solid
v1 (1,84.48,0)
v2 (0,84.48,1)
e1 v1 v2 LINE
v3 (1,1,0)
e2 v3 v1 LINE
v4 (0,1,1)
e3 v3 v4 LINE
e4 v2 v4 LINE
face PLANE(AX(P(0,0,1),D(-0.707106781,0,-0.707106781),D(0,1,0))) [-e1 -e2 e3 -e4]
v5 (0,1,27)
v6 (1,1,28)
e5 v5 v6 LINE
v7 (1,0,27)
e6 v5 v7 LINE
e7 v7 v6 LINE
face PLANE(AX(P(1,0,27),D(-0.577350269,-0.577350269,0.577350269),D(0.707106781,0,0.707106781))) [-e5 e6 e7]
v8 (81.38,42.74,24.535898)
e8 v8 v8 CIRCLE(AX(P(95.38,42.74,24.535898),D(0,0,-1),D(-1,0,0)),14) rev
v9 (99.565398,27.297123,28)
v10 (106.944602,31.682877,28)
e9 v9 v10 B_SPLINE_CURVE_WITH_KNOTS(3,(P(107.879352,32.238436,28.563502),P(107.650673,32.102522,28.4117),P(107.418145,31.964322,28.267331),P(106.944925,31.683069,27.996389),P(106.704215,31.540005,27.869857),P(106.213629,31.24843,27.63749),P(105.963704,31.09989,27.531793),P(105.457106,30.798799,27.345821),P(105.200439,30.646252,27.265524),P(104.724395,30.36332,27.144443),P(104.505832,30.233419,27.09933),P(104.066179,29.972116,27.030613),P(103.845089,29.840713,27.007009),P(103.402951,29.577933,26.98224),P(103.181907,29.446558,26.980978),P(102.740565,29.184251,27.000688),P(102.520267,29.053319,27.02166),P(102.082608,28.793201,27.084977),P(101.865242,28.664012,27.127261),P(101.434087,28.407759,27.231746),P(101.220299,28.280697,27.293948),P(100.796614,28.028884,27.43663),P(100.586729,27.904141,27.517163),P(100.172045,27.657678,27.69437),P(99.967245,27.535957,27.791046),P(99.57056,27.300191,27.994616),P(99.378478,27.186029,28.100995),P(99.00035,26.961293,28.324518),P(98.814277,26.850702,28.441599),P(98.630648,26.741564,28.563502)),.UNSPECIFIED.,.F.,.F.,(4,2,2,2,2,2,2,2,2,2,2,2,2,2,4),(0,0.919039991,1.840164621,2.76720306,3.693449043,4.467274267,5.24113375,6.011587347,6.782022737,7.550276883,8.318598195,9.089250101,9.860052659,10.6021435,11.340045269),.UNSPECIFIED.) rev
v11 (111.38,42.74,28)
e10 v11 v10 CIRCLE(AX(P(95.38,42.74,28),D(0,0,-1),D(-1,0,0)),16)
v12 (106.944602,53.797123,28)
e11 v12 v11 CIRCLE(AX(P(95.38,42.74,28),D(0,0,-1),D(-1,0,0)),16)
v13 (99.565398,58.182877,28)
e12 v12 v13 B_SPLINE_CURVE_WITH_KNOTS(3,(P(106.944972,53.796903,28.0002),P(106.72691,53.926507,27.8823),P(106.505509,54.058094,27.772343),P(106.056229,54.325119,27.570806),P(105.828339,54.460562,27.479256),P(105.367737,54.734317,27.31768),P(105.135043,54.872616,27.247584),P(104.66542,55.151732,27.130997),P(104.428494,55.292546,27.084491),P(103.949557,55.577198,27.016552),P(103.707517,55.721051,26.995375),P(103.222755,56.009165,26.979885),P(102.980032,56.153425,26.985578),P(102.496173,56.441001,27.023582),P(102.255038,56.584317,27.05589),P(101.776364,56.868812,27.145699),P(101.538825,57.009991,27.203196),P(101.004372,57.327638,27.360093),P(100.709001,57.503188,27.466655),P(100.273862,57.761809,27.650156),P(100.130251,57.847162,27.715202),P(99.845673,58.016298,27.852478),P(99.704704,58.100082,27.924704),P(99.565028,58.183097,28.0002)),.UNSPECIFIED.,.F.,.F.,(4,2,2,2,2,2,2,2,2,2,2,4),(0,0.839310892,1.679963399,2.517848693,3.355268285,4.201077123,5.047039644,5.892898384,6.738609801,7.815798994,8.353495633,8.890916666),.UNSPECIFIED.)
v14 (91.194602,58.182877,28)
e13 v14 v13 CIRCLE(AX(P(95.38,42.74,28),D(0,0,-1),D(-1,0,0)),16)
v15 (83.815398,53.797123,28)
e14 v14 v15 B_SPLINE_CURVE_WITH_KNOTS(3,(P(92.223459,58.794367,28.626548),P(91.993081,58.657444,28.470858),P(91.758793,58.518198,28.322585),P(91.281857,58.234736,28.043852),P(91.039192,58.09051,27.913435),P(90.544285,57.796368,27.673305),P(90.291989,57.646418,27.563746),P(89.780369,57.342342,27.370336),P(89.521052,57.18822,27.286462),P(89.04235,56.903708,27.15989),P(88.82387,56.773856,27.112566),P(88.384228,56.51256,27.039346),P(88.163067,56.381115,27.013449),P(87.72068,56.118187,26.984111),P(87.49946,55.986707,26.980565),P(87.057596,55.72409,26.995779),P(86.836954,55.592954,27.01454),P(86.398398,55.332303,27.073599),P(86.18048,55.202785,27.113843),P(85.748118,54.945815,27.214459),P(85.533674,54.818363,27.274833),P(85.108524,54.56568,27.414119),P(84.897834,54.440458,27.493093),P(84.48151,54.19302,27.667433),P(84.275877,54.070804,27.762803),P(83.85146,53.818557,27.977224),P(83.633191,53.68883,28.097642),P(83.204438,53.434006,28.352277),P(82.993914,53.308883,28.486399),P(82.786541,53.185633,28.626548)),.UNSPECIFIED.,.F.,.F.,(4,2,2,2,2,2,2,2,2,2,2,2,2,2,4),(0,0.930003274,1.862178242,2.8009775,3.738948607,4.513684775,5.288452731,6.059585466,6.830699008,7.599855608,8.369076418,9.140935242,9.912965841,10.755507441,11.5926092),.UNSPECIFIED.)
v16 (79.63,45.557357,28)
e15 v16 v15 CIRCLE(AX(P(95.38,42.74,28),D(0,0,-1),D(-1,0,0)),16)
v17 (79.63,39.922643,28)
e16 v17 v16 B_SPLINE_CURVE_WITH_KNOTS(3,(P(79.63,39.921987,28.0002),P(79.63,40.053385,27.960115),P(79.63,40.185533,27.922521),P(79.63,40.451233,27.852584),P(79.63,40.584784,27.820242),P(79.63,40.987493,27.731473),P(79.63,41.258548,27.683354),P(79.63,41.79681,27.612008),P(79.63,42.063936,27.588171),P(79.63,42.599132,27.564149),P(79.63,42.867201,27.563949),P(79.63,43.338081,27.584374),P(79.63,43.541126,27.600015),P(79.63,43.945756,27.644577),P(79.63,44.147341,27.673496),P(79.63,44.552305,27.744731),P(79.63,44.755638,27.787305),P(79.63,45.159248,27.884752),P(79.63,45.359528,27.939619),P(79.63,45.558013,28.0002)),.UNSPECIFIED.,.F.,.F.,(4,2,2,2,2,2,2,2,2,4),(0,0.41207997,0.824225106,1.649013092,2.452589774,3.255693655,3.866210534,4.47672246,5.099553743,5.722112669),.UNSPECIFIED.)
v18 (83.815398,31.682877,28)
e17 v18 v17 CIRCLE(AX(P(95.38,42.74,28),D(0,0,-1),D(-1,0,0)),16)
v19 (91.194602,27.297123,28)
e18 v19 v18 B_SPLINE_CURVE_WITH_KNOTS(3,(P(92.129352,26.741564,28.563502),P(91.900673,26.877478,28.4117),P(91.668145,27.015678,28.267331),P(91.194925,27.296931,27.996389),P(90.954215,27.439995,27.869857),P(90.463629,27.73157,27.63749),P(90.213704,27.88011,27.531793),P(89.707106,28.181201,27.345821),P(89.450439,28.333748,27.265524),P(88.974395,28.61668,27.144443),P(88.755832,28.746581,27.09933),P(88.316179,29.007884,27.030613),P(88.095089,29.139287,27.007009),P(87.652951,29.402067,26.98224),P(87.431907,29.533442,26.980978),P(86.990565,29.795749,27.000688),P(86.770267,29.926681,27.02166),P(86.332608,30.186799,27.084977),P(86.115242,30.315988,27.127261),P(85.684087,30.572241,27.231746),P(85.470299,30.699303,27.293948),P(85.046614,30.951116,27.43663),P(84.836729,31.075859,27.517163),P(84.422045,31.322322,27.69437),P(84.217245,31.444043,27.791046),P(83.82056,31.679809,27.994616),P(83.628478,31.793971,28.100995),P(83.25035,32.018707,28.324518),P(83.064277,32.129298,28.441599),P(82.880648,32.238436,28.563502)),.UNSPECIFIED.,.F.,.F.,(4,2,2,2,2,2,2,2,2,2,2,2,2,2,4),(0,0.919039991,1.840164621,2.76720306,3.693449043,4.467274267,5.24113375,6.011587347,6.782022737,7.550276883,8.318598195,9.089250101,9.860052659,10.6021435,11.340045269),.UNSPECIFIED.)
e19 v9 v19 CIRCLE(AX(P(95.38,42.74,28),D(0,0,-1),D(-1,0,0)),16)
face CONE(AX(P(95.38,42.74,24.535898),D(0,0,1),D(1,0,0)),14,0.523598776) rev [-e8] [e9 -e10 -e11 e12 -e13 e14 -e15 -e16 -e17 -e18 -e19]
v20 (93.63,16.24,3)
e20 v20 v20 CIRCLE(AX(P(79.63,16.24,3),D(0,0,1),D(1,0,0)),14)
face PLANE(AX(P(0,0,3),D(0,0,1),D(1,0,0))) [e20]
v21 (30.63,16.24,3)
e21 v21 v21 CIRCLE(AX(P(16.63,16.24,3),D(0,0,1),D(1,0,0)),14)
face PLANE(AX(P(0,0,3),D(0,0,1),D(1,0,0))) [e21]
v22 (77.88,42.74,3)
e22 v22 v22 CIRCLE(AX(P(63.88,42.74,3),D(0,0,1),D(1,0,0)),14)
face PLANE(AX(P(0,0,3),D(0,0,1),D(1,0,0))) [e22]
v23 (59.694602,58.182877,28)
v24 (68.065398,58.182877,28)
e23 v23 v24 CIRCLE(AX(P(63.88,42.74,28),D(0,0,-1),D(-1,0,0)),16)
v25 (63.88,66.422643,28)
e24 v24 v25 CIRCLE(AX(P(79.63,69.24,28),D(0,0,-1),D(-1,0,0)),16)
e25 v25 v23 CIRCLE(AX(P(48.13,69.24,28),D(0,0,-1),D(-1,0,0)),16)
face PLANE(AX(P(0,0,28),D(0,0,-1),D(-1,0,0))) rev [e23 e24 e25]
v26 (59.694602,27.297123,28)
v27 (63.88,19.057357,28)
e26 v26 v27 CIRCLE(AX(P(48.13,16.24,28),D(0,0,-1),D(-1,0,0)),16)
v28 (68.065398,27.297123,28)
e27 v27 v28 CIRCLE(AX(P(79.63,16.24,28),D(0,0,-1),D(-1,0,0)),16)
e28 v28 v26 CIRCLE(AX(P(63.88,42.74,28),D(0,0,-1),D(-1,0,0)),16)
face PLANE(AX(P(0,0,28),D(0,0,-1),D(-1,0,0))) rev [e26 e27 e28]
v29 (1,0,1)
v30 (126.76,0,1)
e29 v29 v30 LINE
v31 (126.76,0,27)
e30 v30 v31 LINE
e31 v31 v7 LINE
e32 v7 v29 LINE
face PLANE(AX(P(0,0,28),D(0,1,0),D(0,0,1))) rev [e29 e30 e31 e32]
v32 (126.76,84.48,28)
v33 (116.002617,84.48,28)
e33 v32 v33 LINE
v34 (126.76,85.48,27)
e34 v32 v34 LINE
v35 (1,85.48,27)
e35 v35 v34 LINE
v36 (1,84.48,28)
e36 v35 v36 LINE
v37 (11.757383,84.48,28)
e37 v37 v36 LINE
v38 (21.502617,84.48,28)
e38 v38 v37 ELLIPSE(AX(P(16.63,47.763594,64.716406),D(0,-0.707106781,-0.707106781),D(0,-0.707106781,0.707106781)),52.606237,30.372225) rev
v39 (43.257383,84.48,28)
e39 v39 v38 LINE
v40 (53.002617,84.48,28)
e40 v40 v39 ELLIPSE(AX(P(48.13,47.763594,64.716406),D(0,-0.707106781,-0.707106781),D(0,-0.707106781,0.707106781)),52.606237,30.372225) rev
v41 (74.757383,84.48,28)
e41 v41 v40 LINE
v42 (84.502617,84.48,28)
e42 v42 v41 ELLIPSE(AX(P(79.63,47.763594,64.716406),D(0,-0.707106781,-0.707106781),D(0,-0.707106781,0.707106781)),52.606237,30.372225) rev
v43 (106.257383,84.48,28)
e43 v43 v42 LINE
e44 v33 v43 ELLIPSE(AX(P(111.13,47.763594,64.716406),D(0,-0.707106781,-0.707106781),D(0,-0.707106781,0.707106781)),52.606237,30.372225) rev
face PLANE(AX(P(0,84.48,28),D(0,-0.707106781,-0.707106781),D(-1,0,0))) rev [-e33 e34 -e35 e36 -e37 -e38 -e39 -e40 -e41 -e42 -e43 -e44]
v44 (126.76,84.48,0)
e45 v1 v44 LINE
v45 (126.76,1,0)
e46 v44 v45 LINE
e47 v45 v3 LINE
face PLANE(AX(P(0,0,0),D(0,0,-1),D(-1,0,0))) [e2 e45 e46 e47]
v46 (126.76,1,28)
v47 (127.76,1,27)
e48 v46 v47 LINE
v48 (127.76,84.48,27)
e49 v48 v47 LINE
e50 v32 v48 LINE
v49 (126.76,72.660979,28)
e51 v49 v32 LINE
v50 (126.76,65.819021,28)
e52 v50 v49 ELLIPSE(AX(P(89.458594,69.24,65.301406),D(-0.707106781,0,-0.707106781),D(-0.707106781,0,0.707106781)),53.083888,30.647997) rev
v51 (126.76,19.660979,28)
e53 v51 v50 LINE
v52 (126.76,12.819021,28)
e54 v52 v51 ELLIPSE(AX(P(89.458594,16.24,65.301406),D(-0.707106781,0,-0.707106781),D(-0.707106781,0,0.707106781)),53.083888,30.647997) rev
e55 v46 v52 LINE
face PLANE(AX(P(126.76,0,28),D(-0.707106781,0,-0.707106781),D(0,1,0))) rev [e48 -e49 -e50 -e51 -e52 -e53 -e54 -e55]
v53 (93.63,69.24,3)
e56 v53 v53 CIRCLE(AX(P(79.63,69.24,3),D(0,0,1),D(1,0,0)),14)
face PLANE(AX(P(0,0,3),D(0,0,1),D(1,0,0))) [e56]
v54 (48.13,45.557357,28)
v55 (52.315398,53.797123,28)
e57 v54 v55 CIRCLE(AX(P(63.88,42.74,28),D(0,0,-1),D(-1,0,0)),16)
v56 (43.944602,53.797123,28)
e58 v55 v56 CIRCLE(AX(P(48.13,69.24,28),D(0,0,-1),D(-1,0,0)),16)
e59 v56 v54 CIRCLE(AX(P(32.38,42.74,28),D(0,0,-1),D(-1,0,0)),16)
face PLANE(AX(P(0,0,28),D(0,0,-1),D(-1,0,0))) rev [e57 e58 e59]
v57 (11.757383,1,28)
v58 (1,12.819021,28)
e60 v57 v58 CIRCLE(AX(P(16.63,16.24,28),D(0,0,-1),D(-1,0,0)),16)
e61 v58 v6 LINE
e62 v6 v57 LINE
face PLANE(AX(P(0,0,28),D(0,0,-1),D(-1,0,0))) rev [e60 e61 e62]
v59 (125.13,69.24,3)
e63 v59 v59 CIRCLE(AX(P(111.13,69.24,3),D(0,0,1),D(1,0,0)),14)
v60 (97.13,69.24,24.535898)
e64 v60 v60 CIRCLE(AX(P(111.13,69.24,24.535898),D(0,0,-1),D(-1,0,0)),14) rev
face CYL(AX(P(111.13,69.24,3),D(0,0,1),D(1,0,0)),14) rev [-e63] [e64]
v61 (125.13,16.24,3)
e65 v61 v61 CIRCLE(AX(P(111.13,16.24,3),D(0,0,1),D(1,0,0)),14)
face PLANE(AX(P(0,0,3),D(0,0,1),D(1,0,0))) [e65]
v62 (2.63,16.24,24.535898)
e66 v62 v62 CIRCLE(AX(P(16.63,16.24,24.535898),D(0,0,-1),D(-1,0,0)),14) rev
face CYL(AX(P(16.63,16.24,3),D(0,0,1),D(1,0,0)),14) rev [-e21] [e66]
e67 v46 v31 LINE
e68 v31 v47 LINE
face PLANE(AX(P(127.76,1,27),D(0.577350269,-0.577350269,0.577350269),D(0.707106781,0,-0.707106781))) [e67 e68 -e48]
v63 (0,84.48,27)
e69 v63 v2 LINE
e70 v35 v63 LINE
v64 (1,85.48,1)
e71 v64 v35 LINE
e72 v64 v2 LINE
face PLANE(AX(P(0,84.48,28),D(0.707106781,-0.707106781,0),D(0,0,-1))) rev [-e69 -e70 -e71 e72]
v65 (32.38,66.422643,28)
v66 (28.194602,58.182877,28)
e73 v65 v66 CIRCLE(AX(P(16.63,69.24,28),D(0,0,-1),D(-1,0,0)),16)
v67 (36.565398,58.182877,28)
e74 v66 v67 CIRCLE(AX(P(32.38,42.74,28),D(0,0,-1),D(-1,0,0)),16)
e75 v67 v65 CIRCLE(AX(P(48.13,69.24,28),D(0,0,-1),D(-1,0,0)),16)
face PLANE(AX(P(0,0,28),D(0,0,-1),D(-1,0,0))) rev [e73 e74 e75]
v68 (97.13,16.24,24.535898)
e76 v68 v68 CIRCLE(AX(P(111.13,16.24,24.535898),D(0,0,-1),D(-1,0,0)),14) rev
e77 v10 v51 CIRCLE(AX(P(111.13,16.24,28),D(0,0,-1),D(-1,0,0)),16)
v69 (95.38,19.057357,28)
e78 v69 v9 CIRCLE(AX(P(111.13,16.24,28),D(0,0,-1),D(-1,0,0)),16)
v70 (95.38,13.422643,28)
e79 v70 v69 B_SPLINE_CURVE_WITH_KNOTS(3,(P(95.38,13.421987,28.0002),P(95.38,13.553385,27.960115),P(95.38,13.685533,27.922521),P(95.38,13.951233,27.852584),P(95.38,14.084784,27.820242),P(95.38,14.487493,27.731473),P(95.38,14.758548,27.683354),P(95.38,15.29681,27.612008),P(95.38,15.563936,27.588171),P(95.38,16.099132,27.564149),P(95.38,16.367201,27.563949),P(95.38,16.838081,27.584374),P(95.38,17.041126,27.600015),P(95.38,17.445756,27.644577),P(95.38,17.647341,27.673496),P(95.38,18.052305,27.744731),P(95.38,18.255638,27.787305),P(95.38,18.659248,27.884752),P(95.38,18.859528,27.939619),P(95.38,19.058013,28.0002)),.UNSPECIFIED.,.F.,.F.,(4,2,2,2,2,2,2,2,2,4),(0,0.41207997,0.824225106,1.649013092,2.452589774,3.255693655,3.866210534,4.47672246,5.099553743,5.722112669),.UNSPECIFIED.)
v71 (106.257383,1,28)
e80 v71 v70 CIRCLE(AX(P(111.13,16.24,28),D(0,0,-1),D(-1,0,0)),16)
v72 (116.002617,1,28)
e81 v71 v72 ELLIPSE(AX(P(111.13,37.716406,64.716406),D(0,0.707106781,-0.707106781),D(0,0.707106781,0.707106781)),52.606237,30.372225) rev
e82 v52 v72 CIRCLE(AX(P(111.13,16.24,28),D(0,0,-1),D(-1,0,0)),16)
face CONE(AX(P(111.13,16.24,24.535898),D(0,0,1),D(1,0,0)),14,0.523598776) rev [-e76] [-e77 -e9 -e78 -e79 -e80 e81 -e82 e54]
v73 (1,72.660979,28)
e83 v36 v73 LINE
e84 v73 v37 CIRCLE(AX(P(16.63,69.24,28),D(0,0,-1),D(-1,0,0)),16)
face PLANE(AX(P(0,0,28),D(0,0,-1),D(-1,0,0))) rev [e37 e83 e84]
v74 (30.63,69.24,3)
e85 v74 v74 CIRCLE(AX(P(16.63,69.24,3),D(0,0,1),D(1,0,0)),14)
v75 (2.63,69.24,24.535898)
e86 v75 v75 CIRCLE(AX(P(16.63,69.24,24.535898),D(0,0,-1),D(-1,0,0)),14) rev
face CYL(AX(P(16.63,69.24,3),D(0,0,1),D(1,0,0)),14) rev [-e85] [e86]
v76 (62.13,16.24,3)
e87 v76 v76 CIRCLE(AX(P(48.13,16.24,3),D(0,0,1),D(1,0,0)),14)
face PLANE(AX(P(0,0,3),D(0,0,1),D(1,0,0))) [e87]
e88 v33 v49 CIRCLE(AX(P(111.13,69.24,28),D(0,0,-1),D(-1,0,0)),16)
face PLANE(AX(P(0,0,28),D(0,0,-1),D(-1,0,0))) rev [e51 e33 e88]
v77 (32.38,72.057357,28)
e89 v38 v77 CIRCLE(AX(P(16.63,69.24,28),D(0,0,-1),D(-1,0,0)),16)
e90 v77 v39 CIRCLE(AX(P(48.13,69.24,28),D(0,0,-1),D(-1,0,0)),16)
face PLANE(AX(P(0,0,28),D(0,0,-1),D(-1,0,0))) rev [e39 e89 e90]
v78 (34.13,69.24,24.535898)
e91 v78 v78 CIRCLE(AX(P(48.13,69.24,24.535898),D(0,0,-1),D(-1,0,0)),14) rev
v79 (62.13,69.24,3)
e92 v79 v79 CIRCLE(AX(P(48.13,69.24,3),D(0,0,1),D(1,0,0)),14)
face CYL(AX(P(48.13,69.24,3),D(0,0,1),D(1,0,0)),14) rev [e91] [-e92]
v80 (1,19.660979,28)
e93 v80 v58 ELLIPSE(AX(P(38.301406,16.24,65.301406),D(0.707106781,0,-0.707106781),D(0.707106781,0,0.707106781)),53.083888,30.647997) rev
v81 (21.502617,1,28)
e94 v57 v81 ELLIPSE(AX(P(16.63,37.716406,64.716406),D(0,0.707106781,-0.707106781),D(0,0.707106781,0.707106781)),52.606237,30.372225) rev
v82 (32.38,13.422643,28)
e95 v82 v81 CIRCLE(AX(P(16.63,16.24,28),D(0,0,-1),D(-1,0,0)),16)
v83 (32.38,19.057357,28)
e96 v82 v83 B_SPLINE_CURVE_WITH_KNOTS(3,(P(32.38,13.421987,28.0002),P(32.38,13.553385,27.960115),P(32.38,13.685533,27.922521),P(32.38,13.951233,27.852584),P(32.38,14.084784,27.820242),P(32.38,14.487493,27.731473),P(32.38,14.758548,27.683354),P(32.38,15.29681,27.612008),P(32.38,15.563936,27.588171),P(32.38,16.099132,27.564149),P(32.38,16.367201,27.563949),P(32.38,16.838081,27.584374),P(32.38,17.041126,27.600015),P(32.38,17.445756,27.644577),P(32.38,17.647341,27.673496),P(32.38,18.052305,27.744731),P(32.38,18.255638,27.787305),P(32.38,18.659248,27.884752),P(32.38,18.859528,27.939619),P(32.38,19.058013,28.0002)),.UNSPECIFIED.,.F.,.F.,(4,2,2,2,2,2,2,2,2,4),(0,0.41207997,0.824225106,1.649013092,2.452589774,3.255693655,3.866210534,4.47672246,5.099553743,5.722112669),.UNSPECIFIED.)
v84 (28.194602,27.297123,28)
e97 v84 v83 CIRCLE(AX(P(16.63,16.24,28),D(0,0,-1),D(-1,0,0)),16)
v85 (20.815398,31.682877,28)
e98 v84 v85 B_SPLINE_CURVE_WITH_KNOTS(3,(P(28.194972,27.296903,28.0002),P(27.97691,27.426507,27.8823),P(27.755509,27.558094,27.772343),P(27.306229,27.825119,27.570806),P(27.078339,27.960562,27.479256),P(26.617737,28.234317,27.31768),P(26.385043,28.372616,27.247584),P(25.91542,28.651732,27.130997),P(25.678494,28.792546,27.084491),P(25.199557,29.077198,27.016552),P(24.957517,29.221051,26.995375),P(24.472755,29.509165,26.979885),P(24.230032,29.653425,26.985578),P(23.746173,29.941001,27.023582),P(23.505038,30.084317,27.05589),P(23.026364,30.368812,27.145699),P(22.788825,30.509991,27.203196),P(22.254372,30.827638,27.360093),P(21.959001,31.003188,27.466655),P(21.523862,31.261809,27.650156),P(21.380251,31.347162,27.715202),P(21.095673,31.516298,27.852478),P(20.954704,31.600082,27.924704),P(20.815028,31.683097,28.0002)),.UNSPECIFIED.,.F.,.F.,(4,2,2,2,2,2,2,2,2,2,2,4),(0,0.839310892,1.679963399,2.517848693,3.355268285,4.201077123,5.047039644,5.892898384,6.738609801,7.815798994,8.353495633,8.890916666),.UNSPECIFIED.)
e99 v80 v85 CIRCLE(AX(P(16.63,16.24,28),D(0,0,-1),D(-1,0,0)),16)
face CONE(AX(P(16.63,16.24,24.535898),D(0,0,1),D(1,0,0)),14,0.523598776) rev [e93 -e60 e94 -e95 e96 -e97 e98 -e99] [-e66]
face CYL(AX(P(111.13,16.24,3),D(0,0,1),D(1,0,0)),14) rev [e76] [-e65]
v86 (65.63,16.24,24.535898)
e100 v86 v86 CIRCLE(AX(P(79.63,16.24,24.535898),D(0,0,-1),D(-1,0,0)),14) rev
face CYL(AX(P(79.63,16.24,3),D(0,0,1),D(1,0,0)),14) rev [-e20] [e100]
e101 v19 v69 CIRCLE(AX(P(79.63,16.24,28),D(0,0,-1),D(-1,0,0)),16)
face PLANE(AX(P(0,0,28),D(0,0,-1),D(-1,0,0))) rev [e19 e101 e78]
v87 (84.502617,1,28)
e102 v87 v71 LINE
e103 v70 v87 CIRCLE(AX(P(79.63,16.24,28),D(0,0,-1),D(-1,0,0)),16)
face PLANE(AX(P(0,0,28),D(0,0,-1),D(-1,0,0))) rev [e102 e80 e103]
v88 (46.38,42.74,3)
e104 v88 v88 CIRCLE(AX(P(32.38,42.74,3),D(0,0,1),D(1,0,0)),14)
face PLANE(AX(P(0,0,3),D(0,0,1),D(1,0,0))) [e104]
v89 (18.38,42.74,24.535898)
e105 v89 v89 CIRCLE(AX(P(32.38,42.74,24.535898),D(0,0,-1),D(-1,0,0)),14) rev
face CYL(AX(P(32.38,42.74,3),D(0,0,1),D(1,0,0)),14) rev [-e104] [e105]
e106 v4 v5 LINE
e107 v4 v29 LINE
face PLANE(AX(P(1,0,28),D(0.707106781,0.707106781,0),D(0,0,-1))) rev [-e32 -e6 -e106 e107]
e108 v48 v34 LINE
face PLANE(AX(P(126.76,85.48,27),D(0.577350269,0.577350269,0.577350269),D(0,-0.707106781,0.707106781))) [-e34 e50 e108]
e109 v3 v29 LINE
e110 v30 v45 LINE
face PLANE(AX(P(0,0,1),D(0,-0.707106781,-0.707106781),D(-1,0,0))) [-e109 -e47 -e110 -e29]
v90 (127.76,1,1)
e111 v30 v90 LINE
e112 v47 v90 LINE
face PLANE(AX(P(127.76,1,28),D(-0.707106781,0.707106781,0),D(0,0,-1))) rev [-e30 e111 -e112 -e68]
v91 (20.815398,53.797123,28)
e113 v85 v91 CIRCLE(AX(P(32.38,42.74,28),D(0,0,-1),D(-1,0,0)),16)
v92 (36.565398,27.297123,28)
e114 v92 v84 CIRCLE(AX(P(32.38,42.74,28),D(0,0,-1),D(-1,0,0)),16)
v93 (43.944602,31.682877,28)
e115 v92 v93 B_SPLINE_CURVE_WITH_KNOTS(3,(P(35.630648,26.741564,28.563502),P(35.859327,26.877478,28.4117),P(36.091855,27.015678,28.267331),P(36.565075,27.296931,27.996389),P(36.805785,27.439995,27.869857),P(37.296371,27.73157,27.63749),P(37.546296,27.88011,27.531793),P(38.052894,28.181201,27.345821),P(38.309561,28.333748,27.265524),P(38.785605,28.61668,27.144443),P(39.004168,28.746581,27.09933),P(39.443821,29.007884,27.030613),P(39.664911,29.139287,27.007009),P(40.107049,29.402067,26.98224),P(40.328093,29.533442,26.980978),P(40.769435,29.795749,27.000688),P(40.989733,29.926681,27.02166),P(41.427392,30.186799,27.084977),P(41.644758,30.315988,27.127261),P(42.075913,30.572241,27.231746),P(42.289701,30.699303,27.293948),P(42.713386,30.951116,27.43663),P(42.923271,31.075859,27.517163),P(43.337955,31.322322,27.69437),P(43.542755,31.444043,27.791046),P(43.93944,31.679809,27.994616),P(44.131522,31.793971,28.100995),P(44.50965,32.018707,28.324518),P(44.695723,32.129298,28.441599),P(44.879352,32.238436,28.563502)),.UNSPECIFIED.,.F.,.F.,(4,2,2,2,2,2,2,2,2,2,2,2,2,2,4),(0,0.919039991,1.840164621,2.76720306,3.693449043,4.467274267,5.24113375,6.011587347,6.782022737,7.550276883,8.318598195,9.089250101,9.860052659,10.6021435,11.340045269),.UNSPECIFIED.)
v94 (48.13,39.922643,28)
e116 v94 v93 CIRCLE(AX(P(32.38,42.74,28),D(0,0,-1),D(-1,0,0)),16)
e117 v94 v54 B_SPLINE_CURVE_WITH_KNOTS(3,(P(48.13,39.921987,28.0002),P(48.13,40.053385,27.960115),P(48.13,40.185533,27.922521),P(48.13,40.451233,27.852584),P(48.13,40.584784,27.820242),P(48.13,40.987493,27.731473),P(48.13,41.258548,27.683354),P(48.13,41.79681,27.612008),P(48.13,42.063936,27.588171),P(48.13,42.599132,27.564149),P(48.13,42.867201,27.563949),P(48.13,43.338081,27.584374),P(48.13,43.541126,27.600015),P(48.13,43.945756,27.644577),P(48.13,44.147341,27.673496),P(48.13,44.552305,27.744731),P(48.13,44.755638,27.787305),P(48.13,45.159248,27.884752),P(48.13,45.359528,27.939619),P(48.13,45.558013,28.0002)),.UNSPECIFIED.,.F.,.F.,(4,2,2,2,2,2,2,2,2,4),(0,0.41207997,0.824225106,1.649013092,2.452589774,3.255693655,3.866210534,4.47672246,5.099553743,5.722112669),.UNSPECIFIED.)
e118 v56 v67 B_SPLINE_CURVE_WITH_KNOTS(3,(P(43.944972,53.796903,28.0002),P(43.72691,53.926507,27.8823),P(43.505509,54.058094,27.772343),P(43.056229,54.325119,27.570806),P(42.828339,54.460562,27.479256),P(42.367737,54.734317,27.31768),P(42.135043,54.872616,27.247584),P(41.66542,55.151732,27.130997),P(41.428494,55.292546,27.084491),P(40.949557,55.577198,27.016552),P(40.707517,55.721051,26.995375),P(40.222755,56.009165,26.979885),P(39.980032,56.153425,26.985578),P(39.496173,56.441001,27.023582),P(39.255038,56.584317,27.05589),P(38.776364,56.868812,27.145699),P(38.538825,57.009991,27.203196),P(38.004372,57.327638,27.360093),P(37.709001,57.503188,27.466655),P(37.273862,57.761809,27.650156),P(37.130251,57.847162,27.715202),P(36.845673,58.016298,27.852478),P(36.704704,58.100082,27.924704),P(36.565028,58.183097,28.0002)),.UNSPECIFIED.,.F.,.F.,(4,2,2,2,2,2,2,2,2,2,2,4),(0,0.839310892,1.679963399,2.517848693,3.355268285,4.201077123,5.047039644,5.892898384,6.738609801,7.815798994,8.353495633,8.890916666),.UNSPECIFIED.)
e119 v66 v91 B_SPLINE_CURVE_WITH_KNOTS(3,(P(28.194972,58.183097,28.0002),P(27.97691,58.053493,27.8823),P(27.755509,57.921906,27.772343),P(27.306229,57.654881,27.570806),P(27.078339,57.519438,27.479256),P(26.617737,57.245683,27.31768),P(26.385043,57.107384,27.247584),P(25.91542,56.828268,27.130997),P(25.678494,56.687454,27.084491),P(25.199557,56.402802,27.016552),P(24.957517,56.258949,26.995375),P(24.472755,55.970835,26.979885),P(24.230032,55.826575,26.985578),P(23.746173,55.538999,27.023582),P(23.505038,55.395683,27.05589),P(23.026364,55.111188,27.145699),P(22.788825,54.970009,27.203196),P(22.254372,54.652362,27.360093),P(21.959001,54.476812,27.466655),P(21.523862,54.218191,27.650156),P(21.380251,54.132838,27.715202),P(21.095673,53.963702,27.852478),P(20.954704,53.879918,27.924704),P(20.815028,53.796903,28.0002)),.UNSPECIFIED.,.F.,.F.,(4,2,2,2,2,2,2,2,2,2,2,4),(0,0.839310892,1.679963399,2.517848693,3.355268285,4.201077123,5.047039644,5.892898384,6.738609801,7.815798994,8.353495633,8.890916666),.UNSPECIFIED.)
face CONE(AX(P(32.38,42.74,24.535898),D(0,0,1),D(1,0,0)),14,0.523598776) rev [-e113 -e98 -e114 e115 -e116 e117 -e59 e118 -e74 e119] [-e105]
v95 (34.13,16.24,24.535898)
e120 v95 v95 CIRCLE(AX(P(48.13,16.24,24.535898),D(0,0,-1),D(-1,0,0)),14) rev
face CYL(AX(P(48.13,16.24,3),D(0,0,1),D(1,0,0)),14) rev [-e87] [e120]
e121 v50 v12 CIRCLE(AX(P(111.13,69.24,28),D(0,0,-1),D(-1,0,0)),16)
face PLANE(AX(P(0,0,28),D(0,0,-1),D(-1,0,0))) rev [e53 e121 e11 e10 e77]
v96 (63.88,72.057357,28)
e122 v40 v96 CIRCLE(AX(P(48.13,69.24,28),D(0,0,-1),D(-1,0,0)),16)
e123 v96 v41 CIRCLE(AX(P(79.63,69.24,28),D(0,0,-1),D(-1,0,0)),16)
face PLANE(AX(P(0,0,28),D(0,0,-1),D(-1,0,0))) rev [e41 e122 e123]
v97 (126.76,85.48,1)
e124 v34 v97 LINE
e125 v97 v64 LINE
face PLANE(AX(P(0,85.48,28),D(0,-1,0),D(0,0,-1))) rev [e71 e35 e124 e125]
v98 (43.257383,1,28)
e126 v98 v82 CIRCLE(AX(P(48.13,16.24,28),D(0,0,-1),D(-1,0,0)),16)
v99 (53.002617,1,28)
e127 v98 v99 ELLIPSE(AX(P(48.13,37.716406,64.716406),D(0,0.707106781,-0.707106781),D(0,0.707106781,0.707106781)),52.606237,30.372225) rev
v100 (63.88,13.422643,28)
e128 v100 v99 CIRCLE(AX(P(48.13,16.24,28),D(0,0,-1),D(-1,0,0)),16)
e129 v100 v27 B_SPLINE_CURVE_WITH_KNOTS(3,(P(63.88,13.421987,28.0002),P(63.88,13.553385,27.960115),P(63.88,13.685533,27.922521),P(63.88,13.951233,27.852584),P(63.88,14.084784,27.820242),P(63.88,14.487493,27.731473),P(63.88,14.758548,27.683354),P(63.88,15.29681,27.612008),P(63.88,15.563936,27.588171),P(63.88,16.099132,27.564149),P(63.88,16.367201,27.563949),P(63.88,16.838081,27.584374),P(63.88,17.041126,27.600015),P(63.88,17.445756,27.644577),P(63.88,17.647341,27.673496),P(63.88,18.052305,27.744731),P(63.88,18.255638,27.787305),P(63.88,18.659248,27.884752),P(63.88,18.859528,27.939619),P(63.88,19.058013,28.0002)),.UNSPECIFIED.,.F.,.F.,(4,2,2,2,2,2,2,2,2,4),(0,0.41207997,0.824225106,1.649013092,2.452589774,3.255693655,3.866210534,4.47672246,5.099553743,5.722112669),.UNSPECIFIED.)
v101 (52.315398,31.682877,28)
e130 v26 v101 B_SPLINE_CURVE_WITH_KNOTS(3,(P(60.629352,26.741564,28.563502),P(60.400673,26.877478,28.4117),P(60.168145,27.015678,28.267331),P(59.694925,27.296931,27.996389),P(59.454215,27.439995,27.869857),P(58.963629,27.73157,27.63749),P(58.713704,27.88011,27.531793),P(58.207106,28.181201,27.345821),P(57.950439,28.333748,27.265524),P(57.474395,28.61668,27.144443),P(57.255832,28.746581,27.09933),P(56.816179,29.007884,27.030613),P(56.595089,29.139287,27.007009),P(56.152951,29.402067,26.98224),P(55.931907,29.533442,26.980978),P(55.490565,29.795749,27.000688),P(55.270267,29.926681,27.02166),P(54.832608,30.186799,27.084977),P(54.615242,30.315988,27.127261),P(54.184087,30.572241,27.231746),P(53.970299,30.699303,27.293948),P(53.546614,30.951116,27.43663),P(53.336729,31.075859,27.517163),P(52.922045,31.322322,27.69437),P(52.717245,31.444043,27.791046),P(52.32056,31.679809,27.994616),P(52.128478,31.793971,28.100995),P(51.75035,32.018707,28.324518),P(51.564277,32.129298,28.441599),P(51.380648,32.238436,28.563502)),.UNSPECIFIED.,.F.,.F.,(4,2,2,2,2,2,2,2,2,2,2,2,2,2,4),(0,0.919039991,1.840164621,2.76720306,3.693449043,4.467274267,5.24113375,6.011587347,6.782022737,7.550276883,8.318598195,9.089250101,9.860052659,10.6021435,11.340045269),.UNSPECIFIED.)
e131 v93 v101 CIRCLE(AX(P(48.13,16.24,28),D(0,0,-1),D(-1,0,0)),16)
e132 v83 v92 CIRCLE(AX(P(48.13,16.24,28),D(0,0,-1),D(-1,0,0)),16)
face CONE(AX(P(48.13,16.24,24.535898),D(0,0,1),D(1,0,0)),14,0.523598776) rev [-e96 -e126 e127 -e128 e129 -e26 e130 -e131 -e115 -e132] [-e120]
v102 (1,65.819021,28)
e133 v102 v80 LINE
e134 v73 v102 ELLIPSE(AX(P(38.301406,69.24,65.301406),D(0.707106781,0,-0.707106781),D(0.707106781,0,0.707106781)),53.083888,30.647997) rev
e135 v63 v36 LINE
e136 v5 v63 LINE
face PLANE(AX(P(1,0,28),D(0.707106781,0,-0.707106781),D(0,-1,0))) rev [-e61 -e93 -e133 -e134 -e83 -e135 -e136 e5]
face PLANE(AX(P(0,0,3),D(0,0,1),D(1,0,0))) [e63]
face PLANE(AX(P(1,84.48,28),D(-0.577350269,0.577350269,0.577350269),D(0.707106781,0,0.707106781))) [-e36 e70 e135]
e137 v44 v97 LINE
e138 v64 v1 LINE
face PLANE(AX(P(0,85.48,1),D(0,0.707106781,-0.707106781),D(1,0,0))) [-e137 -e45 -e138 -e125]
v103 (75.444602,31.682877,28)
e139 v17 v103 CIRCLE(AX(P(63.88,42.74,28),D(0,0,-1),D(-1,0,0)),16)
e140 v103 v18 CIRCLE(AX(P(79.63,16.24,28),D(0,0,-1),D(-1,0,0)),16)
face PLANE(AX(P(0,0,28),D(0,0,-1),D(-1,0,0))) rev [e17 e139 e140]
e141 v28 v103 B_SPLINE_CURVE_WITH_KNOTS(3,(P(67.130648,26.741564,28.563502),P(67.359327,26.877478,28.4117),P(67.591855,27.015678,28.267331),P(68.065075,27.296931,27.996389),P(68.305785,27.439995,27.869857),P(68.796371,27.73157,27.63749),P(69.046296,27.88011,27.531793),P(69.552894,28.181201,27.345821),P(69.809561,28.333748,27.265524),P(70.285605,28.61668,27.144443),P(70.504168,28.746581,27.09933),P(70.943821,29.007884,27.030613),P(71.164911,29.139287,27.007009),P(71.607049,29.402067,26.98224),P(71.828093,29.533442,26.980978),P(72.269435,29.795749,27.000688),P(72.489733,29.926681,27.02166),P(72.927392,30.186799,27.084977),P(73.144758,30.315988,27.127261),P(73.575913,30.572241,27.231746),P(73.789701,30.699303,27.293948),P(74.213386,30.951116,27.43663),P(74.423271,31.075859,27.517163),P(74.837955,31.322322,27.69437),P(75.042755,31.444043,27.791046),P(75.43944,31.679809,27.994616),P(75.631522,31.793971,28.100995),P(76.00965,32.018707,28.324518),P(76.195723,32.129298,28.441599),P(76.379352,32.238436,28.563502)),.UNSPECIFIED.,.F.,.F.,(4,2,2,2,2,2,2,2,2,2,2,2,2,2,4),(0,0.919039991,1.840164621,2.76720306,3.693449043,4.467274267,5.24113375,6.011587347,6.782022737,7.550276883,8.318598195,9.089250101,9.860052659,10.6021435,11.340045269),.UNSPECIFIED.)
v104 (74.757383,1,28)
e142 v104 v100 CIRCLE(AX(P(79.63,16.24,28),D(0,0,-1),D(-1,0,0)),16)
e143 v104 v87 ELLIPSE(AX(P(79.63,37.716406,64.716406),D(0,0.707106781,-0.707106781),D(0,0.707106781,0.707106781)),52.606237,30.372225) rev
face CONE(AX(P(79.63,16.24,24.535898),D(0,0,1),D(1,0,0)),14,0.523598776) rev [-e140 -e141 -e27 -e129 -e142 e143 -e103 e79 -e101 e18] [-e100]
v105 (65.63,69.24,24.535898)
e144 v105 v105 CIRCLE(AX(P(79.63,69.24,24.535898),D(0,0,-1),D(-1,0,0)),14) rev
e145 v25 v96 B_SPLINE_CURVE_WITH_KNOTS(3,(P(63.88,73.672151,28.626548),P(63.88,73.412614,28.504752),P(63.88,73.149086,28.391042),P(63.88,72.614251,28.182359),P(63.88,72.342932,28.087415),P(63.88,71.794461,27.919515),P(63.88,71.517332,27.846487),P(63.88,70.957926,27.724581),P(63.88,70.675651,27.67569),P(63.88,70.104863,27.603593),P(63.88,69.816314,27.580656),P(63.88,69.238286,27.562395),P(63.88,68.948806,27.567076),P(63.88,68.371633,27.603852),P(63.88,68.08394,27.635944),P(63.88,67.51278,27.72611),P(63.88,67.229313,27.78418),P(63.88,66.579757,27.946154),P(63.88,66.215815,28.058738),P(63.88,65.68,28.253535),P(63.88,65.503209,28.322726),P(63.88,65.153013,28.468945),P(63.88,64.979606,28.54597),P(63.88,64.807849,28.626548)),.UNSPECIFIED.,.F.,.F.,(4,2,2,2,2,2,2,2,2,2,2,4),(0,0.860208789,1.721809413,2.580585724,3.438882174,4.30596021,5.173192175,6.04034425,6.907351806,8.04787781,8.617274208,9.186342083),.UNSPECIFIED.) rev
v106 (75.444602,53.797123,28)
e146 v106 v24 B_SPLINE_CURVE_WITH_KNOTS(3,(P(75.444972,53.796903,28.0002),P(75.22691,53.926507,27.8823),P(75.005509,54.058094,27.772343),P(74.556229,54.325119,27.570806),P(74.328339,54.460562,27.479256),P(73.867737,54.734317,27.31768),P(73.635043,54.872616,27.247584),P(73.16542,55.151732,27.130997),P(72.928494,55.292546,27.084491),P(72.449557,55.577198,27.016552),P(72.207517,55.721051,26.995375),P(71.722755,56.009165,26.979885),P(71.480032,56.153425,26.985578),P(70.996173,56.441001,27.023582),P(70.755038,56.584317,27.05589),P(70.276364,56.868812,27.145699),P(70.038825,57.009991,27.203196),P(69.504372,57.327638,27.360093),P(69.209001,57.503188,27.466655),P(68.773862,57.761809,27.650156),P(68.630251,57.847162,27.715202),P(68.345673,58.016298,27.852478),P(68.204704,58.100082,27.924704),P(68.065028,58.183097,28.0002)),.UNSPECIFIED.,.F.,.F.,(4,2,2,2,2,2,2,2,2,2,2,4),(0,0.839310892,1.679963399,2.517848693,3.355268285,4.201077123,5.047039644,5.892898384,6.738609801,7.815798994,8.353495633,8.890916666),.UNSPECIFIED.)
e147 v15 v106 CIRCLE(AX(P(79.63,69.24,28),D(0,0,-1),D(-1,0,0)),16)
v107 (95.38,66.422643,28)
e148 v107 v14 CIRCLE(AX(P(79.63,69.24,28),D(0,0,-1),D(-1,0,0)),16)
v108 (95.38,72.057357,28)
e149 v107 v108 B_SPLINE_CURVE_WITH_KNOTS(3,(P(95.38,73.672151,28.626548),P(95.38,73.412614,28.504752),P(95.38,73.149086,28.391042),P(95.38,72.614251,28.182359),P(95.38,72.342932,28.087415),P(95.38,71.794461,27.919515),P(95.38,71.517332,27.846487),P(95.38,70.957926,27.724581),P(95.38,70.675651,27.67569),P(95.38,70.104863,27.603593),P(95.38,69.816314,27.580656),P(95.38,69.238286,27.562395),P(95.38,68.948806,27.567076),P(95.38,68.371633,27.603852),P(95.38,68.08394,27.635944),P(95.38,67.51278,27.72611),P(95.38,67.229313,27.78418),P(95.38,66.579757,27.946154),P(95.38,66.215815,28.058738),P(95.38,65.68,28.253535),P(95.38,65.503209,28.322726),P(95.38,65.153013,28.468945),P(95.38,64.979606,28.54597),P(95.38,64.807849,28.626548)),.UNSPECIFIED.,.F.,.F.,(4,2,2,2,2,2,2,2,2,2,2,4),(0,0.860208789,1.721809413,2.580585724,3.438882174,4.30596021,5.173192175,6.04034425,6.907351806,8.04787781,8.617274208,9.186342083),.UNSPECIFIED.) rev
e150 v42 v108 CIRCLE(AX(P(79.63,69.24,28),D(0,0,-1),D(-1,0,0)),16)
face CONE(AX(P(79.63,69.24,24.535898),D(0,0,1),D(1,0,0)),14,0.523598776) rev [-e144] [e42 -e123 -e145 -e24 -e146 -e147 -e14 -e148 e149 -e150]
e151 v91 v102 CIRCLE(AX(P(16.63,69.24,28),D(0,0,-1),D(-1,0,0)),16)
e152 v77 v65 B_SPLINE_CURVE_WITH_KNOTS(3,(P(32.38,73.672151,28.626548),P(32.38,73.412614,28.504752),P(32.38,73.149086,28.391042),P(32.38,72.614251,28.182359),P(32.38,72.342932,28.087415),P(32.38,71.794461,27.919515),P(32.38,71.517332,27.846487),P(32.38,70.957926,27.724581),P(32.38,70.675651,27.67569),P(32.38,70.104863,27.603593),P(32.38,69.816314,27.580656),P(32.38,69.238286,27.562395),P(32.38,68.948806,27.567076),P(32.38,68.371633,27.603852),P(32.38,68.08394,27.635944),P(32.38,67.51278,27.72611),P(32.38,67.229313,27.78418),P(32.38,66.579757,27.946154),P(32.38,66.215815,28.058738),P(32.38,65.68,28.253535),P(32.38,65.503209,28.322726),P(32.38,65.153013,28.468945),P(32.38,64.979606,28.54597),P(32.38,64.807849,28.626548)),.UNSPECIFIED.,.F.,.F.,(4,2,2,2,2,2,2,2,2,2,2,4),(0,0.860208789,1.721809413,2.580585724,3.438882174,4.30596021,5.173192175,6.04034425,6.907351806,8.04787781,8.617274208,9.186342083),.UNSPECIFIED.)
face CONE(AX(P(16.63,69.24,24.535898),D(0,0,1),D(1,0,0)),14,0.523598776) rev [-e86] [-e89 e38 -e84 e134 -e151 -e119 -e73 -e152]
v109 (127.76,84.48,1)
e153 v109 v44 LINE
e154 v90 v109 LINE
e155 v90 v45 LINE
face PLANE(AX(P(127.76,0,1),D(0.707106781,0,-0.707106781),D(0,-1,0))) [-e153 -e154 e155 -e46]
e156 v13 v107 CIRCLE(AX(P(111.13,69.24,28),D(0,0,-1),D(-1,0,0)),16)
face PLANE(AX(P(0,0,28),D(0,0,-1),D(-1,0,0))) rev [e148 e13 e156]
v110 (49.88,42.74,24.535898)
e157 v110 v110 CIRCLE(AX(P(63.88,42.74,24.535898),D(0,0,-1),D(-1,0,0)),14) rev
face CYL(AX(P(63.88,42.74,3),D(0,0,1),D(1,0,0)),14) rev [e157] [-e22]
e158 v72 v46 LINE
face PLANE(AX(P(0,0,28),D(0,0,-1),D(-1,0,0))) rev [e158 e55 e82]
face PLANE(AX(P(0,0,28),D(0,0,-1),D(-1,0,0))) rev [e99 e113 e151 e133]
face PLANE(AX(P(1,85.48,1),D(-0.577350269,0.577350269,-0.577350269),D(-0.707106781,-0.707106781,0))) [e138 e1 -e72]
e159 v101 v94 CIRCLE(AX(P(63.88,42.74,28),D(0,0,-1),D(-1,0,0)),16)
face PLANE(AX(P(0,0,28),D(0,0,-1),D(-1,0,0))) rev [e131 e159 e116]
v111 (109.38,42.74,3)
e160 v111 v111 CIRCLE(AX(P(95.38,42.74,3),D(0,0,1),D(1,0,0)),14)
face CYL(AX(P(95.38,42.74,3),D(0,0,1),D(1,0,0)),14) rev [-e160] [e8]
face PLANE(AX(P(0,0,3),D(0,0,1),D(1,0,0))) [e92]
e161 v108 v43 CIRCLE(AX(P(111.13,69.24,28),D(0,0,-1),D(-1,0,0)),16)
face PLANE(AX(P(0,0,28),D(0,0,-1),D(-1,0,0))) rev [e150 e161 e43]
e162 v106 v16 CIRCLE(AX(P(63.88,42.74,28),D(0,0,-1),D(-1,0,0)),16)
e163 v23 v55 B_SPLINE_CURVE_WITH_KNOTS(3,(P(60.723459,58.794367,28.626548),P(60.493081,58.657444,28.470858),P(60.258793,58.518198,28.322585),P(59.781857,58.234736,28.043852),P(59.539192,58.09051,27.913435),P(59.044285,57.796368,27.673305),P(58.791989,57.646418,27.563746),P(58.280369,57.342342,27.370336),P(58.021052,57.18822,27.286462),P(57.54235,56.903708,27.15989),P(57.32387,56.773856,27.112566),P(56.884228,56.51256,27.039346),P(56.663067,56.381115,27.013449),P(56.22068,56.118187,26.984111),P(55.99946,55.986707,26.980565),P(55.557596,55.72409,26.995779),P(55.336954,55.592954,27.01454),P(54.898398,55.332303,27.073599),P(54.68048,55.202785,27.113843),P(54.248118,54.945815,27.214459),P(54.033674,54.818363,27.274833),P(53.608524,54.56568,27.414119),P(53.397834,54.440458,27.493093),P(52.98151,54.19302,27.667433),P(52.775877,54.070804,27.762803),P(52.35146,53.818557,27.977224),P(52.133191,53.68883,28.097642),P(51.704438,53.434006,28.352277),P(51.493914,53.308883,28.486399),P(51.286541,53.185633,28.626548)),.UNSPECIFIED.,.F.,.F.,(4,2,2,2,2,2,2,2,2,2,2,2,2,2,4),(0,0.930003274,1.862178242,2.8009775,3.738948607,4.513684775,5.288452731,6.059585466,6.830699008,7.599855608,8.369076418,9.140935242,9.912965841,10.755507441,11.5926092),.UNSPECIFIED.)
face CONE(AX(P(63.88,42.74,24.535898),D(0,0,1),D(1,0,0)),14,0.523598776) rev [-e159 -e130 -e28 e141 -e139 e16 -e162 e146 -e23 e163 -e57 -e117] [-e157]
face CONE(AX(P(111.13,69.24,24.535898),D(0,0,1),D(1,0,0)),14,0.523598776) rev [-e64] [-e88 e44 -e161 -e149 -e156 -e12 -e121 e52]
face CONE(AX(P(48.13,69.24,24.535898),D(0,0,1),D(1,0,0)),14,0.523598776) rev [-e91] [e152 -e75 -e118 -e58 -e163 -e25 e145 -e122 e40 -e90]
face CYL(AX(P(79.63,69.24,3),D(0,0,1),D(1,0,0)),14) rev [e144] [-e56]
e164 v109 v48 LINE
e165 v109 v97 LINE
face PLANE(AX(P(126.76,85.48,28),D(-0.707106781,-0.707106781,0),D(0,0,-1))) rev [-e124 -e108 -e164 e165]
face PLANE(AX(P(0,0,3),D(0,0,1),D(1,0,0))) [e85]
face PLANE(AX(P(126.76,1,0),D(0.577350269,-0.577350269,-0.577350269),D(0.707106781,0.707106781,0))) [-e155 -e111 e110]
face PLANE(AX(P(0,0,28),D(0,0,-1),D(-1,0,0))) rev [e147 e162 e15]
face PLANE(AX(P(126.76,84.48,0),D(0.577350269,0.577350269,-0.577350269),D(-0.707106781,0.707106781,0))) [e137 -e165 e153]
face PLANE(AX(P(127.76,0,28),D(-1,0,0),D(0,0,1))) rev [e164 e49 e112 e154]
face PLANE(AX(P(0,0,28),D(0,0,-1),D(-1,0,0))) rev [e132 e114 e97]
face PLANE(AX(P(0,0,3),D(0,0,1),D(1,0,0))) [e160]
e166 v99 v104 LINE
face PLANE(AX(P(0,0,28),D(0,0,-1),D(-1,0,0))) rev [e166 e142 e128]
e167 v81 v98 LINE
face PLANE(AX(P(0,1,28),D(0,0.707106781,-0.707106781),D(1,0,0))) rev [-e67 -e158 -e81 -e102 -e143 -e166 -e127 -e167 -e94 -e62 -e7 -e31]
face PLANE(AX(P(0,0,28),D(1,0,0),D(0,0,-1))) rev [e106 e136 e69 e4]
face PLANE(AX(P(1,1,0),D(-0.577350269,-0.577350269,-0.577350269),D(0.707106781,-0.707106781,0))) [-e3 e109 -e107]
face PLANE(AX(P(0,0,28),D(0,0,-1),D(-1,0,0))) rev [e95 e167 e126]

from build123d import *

# Parameters (mm, degrees)
ESQUISSE1_W             = 127.76
ESQUISSE1_H             = 85.48
BOSS_EXTRU_1_DEPTH      = 28
ESQUISSE2_R             = 14
ENL_V_MAT_EXTRU_1_DEPTH = 25
CHANFREIN1_SIZE         = 2
CHANFREIN1_SIZE_2       = 3.464101615


with BuildPart() as part:
    # Esquisse1 → Boss.-Extru.1 (new body)
    with BuildSketch(Plane.XY):
        with Locations((63.88, 42.74)):
            Rectangle(ESQUISSE1_W, ESQUISSE1_H)
    extrude(amount=BOSS_EXTRU_1_DEPTH)

    # Esquisse2 → Enlèv. mat.-Extru.1 (cut)
    with BuildSketch(Plane.XY.offset(28)):
        with Locations((111.13, 69.24)):
            Circle(ESQUISSE2_R)
        with Locations((79.63, 69.24)):
            Circle(ESQUISSE2_R)
        with Locations((48.13, 69.24)):
            Circle(ESQUISSE2_R)
        with Locations((16.63, 69.24)):
            Circle(ESQUISSE2_R)
        with Locations((32.38, 42.74)):
            Circle(ESQUISSE2_R)
        with Locations((16.63, 16.24)):
            Circle(ESQUISSE2_R)
        with Locations((48.13, 16.24)):
            Circle(ESQUISSE2_R)
        with Locations((111.13, 16.24)):
            Circle(ESQUISSE2_R)
        with Locations((79.63, 16.24)):
            Circle(ESQUISSE2_R)
        with Locations((63.88, 42.74)):
            Circle(ESQUISSE2_R)
        with Locations((95.38, 42.74)):
            Circle(ESQUISSE2_R)
    extrude(amount=-ENL_V_MAT_EXTRU_1_DEPTH, mode=Mode.SUBTRACT)

    # Chanfrein1
    # the kernel refuses this chamfer: 3.464101615, 2 mm, written as the material it takes off along each edge
    with BuildSketch(Plane(origin=(79.63, 69.24, 28), x_dir=(1, 0, 0), z_dir=(0, -1, 0))) as chanfrein1_piece_1:
        Polygon((14 + CHANFREIN1_SIZE, 0), (14, -CHANFREIN1_SIZE_2), (14, 0), align=None)
    revolve(axis=Axis((79.63, 69.24, 28), (0, 0, 1)), mode=Mode.SUBTRACT)
    with BuildSketch(Plane(origin=(111.13, 69.24, 28), x_dir=(1, 0, 0), z_dir=(0, -1, 0))) as chanfrein1_piece_2:
        Polygon((14 + CHANFREIN1_SIZE, 0), (14, -CHANFREIN1_SIZE_2), (14, 0), align=None)
    revolve(axis=Axis((111.13, 69.24, 28), (0, 0, 1)), mode=Mode.SUBTRACT)
    with BuildSketch(Plane(origin=(63.88, 42.74, 28), x_dir=(1, 0, 0), z_dir=(0, -1, 0))) as chanfrein1_piece_3:
        Polygon((14 + CHANFREIN1_SIZE, 0), (14, -CHANFREIN1_SIZE_2), (14, 0), align=None)
    revolve(axis=Axis((63.88, 42.74, 28), (0, 0, 1)), mode=Mode.SUBTRACT)
    with BuildSketch(Plane(origin=(95.38, 42.74, 28), x_dir=(1, 0, 0), z_dir=(0, -1, 0))) as chanfrein1_piece_4:
        Polygon((14 + CHANFREIN1_SIZE, 0), (14, -CHANFREIN1_SIZE_2), (14, 0), align=None)
    revolve(axis=Axis((95.38, 42.74, 28), (0, 0, 1)), mode=Mode.SUBTRACT)
    with BuildSketch(Plane(origin=(32.38, 42.74, 28), x_dir=(1, 0, 0), z_dir=(0, -1, 0))) as chanfrein1_piece_5:
        Polygon((14 + CHANFREIN1_SIZE, 0), (14, -CHANFREIN1_SIZE_2), (14, 0), align=None)
    revolve(axis=Axis((32.38, 42.74, 28), (0, 0, 1)), mode=Mode.SUBTRACT)
    with BuildSketch(Plane(origin=(16.63, 16.24, 28), x_dir=(1, 0, 0), z_dir=(0, -1, 0))) as chanfrein1_piece_6:
        Polygon((14 + CHANFREIN1_SIZE, 0), (14, -CHANFREIN1_SIZE_2), (14, 0), align=None)
    revolve(axis=Axis((16.63, 16.24, 28), (0, 0, 1)), mode=Mode.SUBTRACT)
    with BuildSketch(Plane(origin=(16.63, 69.24, 28), x_dir=(1, 0, 0), z_dir=(0, -1, 0))) as chanfrein1_piece_7:
        Polygon((14 + CHANFREIN1_SIZE, 0), (14, -CHANFREIN1_SIZE_2), (14, 0), align=None)
    revolve(axis=Axis((16.63, 69.24, 28), (0, 0, 1)), mode=Mode.SUBTRACT)
    with BuildSketch(Plane(origin=(48.13, 69.24, 28), x_dir=(1, 0, 0), z_dir=(0, -1, 0))) as chanfrein1_piece_8:
        Polygon((14 + CHANFREIN1_SIZE, 0), (14, -CHANFREIN1_SIZE_2), (14, 0), align=None)
    revolve(axis=Axis((48.13, 69.24, 28), (0, 0, 1)), mode=Mode.SUBTRACT)
    with BuildSketch(Plane(origin=(79.63, 16.24, 28), x_dir=(1, 0, 0), z_dir=(0, -1, 0))) as chanfrein1_piece_9:
        Polygon((14 + CHANFREIN1_SIZE, 0), (14, -CHANFREIN1_SIZE_2), (14, 0), align=None)
    revolve(axis=Axis((79.63, 16.24, 28), (0, 0, 1)), mode=Mode.SUBTRACT)
    with BuildSketch(Plane(origin=(111.13, 16.24, 28), x_dir=(1, 0, 0), z_dir=(0, -1, 0))) as chanfrein1_piece_10:
        Polygon((14 + CHANFREIN1_SIZE, 0), (14, -CHANFREIN1_SIZE_2), (14, 0), align=None)
    revolve(axis=Axis((111.13, 16.24, 28), (0, 0, 1)), mode=Mode.SUBTRACT)
    with BuildSketch(Plane(origin=(48.13, 16.24, 28), x_dir=(1, 0, 0), z_dir=(0, -1, 0))) as chanfrein1_piece_11:
        Polygon((14 + CHANFREIN1_SIZE, 0), (14, -CHANFREIN1_SIZE_2), (14, 0), align=None)
    revolve(axis=Axis((48.13, 16.24, 28), (0, 0, 1)), mode=Mode.SUBTRACT)

    # Chanfrein2
    # the kernel refuses this chamfer: 1 mm, written as the material it takes off along each edge
    with BuildSketch(Plane(origin=(127.093333333, 0.666666667, 27.333333333), x_dir=(0.7071067811865476, 0.7071067811865474, 0), z_dir=(0.5773502691896257, -0.5773502691896258, 0.5773502691896258)), Plane(origin=(0.666666667, 84.813333333, 27.333333333), x_dir=(0.7071067811865475, 0, 0.7071067811865476), z_dir=(-0.5773502691896258, 0.5773502691896256, 0.5773502691896257)), Plane(origin=(127.093333333, 84.813333333, 0.666666667), x_dir=(-0.7071067811865476, 0, -0.7071067811865474), z_dir=(0.5773502691896257, 0.5773502691896257, -0.5773502691896258)), Plane(origin=(0.666666667, 0.666666667, 0.666666667), x_dir=(-0.7071067811865475, 0.7071067811865475, 0), z_dir=(-0.5773502691896257, -0.5773502691896257, -0.5773502691896257))) as chanfrein2_piece_1:
        Polygon((-0.707106781, -0.40824829), (0.707106781, -0.40824829), (0, 0.816496581), align=None)
    extrude(amount=1.270170592, mode=Mode.SUBTRACT)
    with BuildSketch(Plane(origin=(127.093333333, 84.813333333, 27.333333333), x_dir=(-0.7071067811865475, 0, 0.7071067811865475), z_dir=(0.5773502691896258, 0.5773502691896258, 0.5773502691896258)), Plane(origin=(0.666666667, 0.666666667, 27.333333333), x_dir=(-0.7071067811865475, 0.7071067811865475, 0), z_dir=(-0.5773502691896258, -0.5773502691896258, 0.5773502691896257)), Plane(origin=(0.666666667, 84.813333333, 0.666666667), x_dir=(0.7071067811865475, 0, -0.7071067811865475), z_dir=(-0.5773502691896258, 0.5773502691896256, -0.5773502691896258)), Plane(origin=(127.093333333, 0.666666667, 0.666666667), x_dir=(0.7071067811865476, 0.7071067811865475, 0), z_dir=(0.5773502691896256, -0.5773502691896258, -0.577350269189626))) as chanfrein2_piece_2:
        Polygon((-0.707106781, 0.40824829), (0.707106781, 0.40824829), (0, -0.816496581), align=None)
    extrude(amount=1.270170592, mode=Mode.SUBTRACT)
    with BuildSketch(Plane(origin=(127.76, -2.571682988, 28), x_dir=(0.0274958766105822, 0, -0.999621916911297), z_dir=(0, 1, 0)), Plane(origin=(0, 88.051682988, 28), x_dir=(-0.02749587661058639, 0, -0.9996219169112968), z_dir=(0, -1, 0))) as chanfrein2_piece_3:
        with BuildLine():
            Line((1.028673195, 0), (-0.056547155, 1.027117794))
            Line((-0.056547155, 1.027117794), (-0.076539593, 1.026567876))
            ThreePointArc((-0.076539593, 1.026567876), (-0.034129227, 0.51339783), (-0.019992438, -0.000549918))
            Line((-0.019992438, -0.000549918), (0.000549918, -0.019992438))
            ThreePointArc((0.000549918, -0.019992438), (0.514497665, -0.00585565), (1.029223113, -0.019992438))
            Line((1.029223113, -0.019992438), (1.028673195, 0))
        make_face()
    extrude(amount=90.623365976, mode=Mode.SUBTRACT)
    with BuildSketch(Plane(origin=(130.331682988, 85.48, 28), x_dir=(0, -0.9996219169112968, 0.02749587661058574), z_dir=(-1, 0, 0)), Plane(origin=(-2.571682988, 0, 0), x_dir=(0, -0.027495876610586372, 0.9996219169112968), z_dir=(1, 0, 0))) as chanfrein2_piece_4:
        with BuildLine():
            Line((1.028673195, 0), (-0.056547155, -1.027117794))
            Line((-0.056547155, -1.027117794), (-0.076539593, -1.026567876))
            ThreePointArc((-0.076539593, -1.026567876), (-0.034129227, -0.51339783), (-0.019992438, 0.000549918))
            Line((-0.019992438, 0.000549918), (0.000549918, 0.019992438))
            ThreePointArc((0.000549918, 0.019992438), (0.514497665, 0.00585565), (1.029223113, 0.019992438))
            Line((1.029223113, 0.019992438), (1.028673195, 0))
        make_face()
    extrude(amount=132.903365976, mode=Mode.SUBTRACT)
    with BuildSketch(Plane(origin=(130.331682988, 85.48, 0), x_dir=(0, -0.9996219169112968, -0.027495876610586483), z_dir=(-1, 0, 0)), Plane(origin=(-2.571682988, 0, 28), x_dir=(0, -0.02749587661058639, -0.9996219169112968), z_dir=(1, 0, 0))) as chanfrein2_piece_5:
        with BuildLine():
            Line((1.028673195, 0), (-0.056547155, 1.027117794))
            Line((-0.056547155, 1.027117794), (-0.076539593, 1.026567876))
            ThreePointArc((-0.076539593, 1.026567876), (-0.034129227, 0.51339783), (-0.019992438, -0.000549918))
            Line((-0.019992438, -0.000549918), (0.000549918, -0.019992438))
            ThreePointArc((0.000549918, -0.019992438), (0.514497665, -0.00585565), (1.029223113, -0.019992438))
            Line((1.029223113, -0.019992438), (1.028673195, 0))
        make_face()
    extrude(amount=132.903365976, mode=Mode.SUBTRACT)
    with BuildSketch(Plane(origin=(127.76, -2.571682988, 0), x_dir=(0.027495876610582174, 0, 0.9996219169112968), z_dir=(0, 1, 0)), Plane(origin=(0, 88.051682988, 0), x_dir=(-0.027495876610586372, 0, 0.9996219169112968), z_dir=(0, -1, 0))) as chanfrein2_piece_6:
        with BuildLine():
            Line((1.028673195, 0), (-0.056547155, -1.027117794))
            Line((-0.056547155, -1.027117794), (-0.076539593, -1.026567876))
            ThreePointArc((-0.076539593, -1.026567876), (-0.034129227, -0.51339783), (-0.019992438, 0.000549918))
            Line((-0.019992438, 0.000549918), (0.000549918, 0.019992438))
            ThreePointArc((0.000549918, 0.019992438), (0.514497665, 0.00585565), (1.029223113, 0.019992438))
            Line((1.029223113, 0.019992438), (1.028673195, 0))
        make_face()
    extrude(amount=90.623365976, mode=Mode.SUBTRACT)
    with BuildSketch(Plane(origin=(0, 85.48, -2.571682988), x_dir=(-0.027495876610586483, -0.9996219169112968, 0), z_dir=(0, 0, 1)), Plane(origin=(0, 0, -2.571682988), x_dir=(0.9996219169112968, -0.027495876610586372, 0), z_dir=(0, 0, 1))) as chanfrein2_piece_7:
        with BuildLine():
            Line((1.028673195, 0), (-0.056547155, 1.027117794))
            Line((-0.056547155, 1.027117794), (-0.076539593, 1.026567876))
            ThreePointArc((-0.076539593, 1.026567876), (-0.034129227, 0.51339783), (-0.019992438, -0.000549918))
            Line((-0.019992438, -0.000549918), (0.000549918, -0.019992438))
            ThreePointArc((0.000549918, -0.019992438), (0.514497665, -0.00585565), (1.029223113, -0.019992438))
            Line((1.029223113, -0.019992438), (1.028673195, 0))
        make_face()
    extrude(amount=33.143365976, mode=Mode.SUBTRACT)
    with BuildSketch(Plane(origin=(127.76, 85.48, -2.571682988), x_dir=(0.02749587661058229, -0.9996219169112968, 0), z_dir=(0, 0, 1)), Plane(origin=(127.76, 0, -2.571682988), x_dir=(-0.9996219169112968, -0.027495876610586483, 0), z_dir=(0, 0, 1))) as chanfrein2_piece_8:
        with BuildLine():
            Line((1.028673195, 0), (-0.056547155, -1.027117794))
            Line((-0.056547155, -1.027117794), (-0.076539593, -1.026567876))
            ThreePointArc((-0.076539593, -1.026567876), (-0.034129227, -0.51339783), (-0.019992438, 0.000549918))
            Line((-0.019992438, 0.000549918), (0.000549918, 0.019992438))
            ThreePointArc((0.000549918, 0.019992438), (0.514497665, 0.00585565), (1.029223113, 0.019992438))
            Line((1.029223113, 0.019992438), (1.028673195, 0))
        make_face()
    extrude(amount=33.143365976, mode=Mode.SUBTRACT)


solid = part.part
